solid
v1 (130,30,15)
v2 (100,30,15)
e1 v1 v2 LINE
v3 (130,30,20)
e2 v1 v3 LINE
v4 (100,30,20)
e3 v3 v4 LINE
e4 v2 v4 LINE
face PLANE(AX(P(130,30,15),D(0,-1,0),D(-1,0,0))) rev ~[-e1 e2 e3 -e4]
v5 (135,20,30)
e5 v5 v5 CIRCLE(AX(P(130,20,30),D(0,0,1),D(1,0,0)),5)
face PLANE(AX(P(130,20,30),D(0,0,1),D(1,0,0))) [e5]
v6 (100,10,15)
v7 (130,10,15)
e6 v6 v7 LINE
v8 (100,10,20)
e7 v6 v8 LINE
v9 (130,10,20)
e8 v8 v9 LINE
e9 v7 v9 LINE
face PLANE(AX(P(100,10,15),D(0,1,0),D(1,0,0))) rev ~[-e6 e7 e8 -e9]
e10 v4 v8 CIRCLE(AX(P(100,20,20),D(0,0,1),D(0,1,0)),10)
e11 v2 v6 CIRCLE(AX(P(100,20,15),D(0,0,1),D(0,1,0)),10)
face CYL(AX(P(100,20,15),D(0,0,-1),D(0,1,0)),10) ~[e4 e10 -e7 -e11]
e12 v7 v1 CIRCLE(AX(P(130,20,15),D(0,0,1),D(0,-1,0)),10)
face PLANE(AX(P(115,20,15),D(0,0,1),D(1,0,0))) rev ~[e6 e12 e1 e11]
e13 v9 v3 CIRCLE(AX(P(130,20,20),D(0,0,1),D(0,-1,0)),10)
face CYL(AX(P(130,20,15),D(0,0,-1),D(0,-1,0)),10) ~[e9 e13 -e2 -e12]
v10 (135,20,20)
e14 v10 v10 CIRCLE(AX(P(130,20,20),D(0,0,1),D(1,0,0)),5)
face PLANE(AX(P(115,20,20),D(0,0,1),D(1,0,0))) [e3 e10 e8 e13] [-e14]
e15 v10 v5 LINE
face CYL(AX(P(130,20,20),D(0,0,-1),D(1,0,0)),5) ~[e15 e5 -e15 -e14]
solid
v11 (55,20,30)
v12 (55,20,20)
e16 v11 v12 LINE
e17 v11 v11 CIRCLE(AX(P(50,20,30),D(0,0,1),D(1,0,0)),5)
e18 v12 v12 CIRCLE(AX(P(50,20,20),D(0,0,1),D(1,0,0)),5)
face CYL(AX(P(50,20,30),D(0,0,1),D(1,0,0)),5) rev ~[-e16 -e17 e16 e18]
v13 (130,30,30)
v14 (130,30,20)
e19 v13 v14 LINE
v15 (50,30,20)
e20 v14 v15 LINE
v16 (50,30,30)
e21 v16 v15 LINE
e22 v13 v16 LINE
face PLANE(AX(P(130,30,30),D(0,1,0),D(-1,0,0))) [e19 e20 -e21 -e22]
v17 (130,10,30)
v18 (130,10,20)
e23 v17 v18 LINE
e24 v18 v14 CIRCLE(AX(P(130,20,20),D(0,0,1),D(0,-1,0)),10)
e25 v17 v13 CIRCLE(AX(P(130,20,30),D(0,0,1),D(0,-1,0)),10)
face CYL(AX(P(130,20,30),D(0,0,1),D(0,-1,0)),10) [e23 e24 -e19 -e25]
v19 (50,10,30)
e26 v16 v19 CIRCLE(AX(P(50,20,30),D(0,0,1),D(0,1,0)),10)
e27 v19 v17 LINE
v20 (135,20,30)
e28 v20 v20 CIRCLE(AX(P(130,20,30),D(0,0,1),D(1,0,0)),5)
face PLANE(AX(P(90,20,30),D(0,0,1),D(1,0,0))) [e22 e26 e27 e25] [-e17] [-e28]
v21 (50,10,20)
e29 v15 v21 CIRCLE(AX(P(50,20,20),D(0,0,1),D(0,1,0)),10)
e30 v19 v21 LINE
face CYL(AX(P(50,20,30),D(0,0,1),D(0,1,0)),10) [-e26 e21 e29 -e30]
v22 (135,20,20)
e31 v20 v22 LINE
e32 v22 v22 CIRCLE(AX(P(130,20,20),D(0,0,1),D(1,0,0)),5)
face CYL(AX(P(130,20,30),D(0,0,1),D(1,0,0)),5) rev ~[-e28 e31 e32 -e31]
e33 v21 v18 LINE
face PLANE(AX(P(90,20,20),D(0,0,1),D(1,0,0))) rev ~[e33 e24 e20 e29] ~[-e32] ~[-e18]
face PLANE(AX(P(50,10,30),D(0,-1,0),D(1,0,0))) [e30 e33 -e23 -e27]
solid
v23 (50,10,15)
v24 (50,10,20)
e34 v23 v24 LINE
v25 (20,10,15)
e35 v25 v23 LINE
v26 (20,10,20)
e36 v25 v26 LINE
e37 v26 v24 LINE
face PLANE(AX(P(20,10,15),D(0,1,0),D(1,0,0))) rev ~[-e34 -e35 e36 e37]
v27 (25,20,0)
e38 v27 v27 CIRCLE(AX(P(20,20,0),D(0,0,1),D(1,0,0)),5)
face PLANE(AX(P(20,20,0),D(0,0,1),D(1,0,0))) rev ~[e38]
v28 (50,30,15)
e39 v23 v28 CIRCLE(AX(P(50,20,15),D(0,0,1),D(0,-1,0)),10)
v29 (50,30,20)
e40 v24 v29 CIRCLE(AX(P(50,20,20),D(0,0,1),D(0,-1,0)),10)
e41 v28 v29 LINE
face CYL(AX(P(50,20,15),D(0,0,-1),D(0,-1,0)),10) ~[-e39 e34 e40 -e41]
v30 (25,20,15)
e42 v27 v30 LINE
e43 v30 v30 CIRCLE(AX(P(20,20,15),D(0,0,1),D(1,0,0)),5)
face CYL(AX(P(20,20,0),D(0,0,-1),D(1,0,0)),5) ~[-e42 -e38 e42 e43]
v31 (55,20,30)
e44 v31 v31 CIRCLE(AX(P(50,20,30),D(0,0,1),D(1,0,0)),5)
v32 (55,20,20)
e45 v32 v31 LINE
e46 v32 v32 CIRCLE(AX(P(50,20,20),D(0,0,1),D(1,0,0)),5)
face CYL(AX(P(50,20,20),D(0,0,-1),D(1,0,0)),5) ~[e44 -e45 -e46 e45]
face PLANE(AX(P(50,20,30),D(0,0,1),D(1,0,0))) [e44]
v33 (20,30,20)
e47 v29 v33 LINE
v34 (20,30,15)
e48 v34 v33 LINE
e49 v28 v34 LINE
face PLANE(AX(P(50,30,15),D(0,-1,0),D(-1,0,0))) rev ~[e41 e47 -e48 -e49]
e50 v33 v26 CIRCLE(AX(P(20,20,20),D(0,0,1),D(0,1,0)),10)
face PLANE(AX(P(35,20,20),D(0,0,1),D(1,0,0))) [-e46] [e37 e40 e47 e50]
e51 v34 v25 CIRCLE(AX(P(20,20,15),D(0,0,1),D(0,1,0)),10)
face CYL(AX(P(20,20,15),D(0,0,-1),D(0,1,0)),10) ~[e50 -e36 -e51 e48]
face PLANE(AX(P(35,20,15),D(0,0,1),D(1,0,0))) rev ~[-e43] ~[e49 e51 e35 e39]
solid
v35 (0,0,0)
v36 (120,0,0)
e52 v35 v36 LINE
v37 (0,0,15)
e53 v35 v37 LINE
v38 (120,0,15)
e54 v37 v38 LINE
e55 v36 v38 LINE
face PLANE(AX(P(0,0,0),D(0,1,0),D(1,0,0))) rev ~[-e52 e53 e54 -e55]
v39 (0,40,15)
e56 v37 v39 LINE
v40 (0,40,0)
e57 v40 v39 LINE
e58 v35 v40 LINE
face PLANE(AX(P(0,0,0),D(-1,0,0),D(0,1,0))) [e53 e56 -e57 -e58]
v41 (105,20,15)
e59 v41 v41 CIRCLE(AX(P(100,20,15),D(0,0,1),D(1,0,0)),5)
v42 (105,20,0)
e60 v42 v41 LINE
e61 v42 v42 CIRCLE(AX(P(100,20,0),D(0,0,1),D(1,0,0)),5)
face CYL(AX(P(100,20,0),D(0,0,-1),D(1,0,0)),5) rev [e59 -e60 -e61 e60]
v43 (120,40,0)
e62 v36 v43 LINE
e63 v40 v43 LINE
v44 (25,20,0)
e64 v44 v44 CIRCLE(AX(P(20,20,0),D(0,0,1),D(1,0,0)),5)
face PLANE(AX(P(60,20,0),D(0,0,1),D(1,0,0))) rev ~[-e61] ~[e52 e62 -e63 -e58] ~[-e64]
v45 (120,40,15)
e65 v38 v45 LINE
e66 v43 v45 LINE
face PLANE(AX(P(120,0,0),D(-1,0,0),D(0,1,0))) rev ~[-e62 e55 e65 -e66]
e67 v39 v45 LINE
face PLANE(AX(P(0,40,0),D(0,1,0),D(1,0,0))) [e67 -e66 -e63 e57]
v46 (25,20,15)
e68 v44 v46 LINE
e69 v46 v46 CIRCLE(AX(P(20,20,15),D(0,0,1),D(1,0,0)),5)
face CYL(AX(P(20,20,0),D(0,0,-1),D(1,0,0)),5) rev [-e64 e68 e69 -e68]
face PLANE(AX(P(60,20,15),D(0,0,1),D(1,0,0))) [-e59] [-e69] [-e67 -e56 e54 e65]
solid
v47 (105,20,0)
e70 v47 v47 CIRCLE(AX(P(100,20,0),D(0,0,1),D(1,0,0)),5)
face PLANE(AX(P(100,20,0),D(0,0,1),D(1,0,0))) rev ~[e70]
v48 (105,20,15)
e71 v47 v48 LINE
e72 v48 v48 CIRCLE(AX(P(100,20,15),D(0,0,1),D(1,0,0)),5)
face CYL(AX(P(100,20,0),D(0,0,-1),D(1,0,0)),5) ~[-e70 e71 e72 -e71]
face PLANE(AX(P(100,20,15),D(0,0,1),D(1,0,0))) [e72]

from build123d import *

# Parameters (mm, degrees)
F0_W      = 120
F0_H      = 40
F0_R      = 5
F1_DEPTH  = 15
F4_DEPTH  = 5
F5_R      = 5
F6_DEPTH  = 10
F7_DEPTH  = 15
F8_R      = 5
F9_DEPTH  = 5
F10_R     = 5
F11_DEPTH = 10
F12_DEPTH = 15
F13_R     = 5
F14_DEPTH = 10


with BuildPart() as f1:
    # F0 (on Top) → F1 (new body)
    with BuildSketch(Plane.XY):
        with Locations((60, 20)):
            Rectangle(F0_W, F0_H)
        with Locations((20, 20)):
            Circle(F0_R, mode=Mode.SUBTRACT)
        with Locations((100, 20)):
            Circle(F0_R, mode=Mode.SUBTRACT)
    extrude(amount=F1_DEPTH)


with BuildPart() as f4:
    # F3 (on face) → F4 (new body)
    with BuildSketch(Plane.XY.offset(15)):
        with BuildLine():
            Line((20, 10), (50, 10))
            ThreePointArc((50, 10), (60, 20), (50, 30))
            Line((50, 30), (20, 30))
            ThreePointArc((20, 30), (10, 20), (20, 10))
        make_face()
    extrude(amount=F4_DEPTH)

    # F5 (on face) → F6 (join)
    with BuildSketch(Plane.XY.offset(20)):
        with Locations((50, 20)):
            Circle(F5_R)
    extrude(amount=F6_DEPTH)

    # F0 (on Top) → F7 (join, through all)
    with BuildSketch(Plane.XY):
        with Locations((20, 20)):
            Circle(F0_R)
    extrude(amount=F7_DEPTH)


with BuildPart() as f9:
    # F8 (on face) → F9 (new body)
    with BuildSketch(Plane.XY.offset(15)):
        with BuildLine():
            ThreePointArc((100, 30), (90, 20), (100, 10))
            Line((100, 10), (130, 10))
            ThreePointArc((130, 10), (140, 20), (130, 30))
            Line((130, 30), (100, 30))
        make_face()
        with Locations((100, 20)):
            Circle(F8_R, mode=Mode.SUBTRACT)
        with Locations((100, 20)):
            Circle(F8_R)
    extrude(amount=F9_DEPTH)

    # F10 (on face) → F11 (join)
    with BuildSketch(Plane.XY.offset(20)):
        with Locations((130, 20)):
            Circle(F10_R)
    extrude(amount=F11_DEPTH)


with BuildPart() as f12:
    # F0 (on Top) → F12 (new body, through all)
    with BuildSketch(Plane.XY):
        with Locations((100, 20)):
            Circle(F0_R)
    extrude(amount=F12_DEPTH)


with BuildPart() as f14:
    # F13 (on face) → F14 (new body)
    with BuildSketch(Plane.XY.offset(30)):
        with BuildLine():
            Line((130, 30), (50, 30))
            ThreePointArc((50, 30), (40, 20), (50, 10))
            Line((50, 10), (130, 10))
            ThreePointArc((130, 10), (140, 20), (130, 30))
        make_face()
        with Locations((50, 20)):
            Circle(F13_R, mode=Mode.SUBTRACT)
        with Locations((130, 20)):
            Circle(F13_R, mode=Mode.SUBTRACT)
    extrude(amount=-F14_DEPTH)


solid = Compound([f1.part, f4.part, f9.part, f12.part, f14.part])
